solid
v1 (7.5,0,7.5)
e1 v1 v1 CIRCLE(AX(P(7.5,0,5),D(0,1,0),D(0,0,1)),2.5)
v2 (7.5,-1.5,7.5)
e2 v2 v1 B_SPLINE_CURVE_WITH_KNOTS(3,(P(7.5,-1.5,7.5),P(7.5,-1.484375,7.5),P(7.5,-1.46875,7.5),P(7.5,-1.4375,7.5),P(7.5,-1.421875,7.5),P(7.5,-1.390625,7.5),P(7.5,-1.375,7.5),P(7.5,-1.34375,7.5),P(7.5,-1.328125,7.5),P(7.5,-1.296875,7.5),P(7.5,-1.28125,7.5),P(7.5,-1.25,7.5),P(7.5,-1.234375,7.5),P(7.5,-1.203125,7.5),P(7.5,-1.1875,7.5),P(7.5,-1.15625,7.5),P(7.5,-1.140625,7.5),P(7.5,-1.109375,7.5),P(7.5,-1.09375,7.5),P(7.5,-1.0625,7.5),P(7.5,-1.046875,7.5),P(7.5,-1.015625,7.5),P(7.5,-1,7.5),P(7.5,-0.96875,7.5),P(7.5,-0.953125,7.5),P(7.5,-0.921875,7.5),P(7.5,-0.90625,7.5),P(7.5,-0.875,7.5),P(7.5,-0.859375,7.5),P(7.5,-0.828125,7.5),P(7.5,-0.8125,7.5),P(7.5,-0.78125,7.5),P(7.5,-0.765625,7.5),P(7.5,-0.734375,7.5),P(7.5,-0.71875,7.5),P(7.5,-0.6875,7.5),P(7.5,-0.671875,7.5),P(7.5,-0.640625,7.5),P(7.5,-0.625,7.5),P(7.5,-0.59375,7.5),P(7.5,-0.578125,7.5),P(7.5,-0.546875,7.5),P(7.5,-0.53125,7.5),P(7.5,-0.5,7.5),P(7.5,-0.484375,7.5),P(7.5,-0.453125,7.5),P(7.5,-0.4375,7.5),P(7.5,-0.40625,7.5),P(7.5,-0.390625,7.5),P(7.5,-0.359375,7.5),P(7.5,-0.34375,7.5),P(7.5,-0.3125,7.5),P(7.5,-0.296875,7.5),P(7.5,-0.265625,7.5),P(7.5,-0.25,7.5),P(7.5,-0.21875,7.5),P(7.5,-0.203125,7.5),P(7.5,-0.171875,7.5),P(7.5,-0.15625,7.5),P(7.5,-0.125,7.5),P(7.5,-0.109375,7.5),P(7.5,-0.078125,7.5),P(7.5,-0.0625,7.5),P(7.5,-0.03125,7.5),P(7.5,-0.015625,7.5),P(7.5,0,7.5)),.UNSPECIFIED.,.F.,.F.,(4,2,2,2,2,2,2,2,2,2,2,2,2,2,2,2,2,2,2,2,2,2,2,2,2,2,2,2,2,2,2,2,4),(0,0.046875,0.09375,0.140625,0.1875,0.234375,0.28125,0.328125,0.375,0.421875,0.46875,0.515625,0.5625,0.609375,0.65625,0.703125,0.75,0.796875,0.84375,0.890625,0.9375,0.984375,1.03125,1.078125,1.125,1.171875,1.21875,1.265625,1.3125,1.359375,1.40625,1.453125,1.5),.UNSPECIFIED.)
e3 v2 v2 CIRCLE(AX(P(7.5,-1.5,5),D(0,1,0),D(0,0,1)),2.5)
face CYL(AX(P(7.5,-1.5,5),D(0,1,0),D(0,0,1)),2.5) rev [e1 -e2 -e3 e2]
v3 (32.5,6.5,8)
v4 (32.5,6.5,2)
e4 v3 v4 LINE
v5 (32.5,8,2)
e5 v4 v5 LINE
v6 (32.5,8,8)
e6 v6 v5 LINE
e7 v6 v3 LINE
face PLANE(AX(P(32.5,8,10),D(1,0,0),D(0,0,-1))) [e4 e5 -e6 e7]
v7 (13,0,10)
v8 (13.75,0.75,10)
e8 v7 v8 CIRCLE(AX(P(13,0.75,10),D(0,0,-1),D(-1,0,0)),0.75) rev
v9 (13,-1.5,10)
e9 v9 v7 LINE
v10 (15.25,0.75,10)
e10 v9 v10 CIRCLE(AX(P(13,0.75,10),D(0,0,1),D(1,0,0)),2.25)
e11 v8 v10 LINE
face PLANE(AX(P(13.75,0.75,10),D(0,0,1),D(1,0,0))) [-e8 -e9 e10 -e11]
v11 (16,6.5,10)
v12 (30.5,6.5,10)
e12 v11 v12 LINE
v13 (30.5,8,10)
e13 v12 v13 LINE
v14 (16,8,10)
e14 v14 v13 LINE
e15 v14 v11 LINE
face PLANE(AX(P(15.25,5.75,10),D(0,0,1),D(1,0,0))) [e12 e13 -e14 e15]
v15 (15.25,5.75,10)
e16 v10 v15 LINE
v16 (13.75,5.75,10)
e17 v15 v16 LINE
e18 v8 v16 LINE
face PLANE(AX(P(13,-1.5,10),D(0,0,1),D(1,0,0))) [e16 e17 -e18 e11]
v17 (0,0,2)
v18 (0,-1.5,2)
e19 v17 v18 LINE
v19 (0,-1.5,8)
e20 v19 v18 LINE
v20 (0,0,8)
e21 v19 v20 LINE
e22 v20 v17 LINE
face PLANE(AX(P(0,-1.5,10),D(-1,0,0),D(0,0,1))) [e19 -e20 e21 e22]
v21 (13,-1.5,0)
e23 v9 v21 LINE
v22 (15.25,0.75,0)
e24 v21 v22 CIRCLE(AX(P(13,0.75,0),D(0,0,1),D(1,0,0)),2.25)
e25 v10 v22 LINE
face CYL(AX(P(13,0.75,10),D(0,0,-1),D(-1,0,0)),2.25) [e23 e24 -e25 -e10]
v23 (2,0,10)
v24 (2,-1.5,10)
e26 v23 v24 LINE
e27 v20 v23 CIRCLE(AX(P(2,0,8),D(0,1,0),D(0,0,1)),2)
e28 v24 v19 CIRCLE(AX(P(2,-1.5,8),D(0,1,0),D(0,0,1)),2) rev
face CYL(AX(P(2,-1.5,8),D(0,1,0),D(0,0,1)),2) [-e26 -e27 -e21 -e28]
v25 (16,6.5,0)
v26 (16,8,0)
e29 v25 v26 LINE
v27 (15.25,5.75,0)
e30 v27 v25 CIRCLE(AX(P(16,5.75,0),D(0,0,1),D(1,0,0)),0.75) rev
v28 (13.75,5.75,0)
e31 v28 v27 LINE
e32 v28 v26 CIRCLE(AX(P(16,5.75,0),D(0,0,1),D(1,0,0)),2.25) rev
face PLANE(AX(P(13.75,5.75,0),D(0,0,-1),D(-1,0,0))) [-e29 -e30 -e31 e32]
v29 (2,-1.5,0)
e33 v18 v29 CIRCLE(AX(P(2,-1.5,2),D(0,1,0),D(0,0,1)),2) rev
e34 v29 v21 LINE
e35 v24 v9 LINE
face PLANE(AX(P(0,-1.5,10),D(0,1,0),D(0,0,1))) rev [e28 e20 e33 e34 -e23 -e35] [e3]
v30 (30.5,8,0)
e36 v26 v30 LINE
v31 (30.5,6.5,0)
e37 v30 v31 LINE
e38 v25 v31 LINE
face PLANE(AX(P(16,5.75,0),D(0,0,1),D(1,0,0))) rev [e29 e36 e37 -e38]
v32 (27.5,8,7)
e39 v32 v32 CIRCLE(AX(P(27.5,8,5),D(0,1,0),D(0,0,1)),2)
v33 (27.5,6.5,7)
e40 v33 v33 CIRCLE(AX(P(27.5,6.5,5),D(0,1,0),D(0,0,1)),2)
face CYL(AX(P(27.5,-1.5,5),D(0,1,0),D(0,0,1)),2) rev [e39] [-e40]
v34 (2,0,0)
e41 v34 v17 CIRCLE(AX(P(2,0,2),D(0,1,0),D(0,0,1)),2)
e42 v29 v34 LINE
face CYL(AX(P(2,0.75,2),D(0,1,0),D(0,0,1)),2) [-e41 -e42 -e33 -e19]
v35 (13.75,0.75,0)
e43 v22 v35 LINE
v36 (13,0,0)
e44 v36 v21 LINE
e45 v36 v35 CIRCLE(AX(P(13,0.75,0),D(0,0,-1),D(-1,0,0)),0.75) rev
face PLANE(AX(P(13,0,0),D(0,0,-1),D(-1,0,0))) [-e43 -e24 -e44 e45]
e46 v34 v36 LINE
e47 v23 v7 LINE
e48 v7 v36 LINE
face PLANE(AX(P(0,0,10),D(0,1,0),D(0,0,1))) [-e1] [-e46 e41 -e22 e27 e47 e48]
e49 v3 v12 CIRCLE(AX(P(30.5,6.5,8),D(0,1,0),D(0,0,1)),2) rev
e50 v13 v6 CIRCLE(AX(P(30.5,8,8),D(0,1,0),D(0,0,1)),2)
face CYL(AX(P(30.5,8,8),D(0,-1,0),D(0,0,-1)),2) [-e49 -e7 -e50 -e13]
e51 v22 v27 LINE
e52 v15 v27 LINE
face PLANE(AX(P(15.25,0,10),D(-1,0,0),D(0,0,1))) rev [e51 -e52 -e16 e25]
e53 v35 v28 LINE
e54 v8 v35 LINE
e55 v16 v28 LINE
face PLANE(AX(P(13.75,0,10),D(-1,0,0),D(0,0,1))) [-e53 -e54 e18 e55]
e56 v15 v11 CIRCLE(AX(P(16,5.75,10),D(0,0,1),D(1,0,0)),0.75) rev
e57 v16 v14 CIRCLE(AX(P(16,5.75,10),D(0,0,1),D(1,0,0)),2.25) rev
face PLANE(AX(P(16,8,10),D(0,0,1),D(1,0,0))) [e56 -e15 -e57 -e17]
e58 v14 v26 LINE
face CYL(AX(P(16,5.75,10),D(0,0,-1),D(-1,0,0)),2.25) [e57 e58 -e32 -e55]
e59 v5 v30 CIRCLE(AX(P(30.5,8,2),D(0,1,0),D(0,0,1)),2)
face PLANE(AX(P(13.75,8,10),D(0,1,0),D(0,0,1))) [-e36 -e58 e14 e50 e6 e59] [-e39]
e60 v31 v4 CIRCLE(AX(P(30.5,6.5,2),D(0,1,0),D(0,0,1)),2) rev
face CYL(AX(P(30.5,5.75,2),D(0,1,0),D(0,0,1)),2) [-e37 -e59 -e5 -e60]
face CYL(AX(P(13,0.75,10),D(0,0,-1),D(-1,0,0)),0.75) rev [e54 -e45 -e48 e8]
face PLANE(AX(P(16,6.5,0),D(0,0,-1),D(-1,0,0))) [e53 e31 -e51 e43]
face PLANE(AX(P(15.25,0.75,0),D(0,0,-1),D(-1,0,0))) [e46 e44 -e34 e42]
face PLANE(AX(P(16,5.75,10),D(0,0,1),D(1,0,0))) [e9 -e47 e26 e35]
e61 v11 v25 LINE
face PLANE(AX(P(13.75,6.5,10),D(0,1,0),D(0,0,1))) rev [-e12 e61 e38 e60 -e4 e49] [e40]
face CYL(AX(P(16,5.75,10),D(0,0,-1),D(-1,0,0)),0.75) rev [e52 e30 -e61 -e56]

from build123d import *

# Parameters (mm, degrees)
BASE_FLANGE1_DEPTH = 10
SKETCH6_R          = 2.5
CUT_EXTRUDE1_DEPTH = 35.932076949
SKETCH7_R          = 2
CUT_EXTRUDE2_DEPTH = 36.305806888
FILLET1_R          = 2


# Sheet-metal steps are written as plain solids
with BuildPart() as part:
    # Sketch1 → Base-Flange1 (new body)
    with BuildSketch(Plane.XY):
        with BuildLine():
            Line((0, 0), (13, 0))
            ThreePointArc((13, 0), (13.530330086, 0.219669914), (13.75, 0.75))
            Line((13.75, 0.75), (13.75, 5.75))
            ThreePointArc((13.75, 5.75), (14.409009742, 7.340990258), (16, 8))
            Line((16, 8), (32.5, 8))
            Line((32.5, 8), (32.5, 6.5))
            Line((32.5, 6.5), (16, 6.5))
            ThreePointArc((16, 6.5), (15.469669914, 6.280330086), (15.25, 5.75))
            Line((15.25, 5.75), (15.25, 0.75))
            ThreePointArc((15.25, 0.75), (14.590990258, -0.840990258), (13, -1.5))
            Line((13, -1.5), (0, -1.5))
            Line((0, -1.5), (0, 0))
        make_face()
    extrude(amount=BASE_FLANGE1_DEPTH)

    # Sketch6 → Cut-Extrude1 (cut, through all)
    with BuildSketch(Plane(origin=(0, 0, 0), x_dir=(1, 0, 0), z_dir=(0, 1, 0))):
        with Locations(Location((7.5, -5, 0), (0, 0, 270))):
            Circle(SKETCH6_R)
    extrude(amount=-CUT_EXTRUDE1_DEPTH, mode=Mode.SUBTRACT)

    # Sketch7 → Cut-Extrude2 (cut, through all)
    with BuildSketch(Plane(origin=(0, 8, 0), x_dir=(1, 0, 0), z_dir=(0, 1, 0))):
        with Locations(Location((27.5, -5, 0), (0, 0, 270))):
            Circle(SKETCH7_R)
    extrude(amount=-CUT_EXTRUDE2_DEPTH, mode=Mode.SUBTRACT)

    # Fillet1
    fillet1_edges = [part.edges().sort_by_distance(p)[0] for p in [
        (0, -0.75, 0),
        (32.5, 7.25, 0),
        (0, -0.75, 10),
        (32.5, 7.25, 10),
    ]]
    fillet(fillet1_edges, radius=FILLET1_R)


solid = part.part
